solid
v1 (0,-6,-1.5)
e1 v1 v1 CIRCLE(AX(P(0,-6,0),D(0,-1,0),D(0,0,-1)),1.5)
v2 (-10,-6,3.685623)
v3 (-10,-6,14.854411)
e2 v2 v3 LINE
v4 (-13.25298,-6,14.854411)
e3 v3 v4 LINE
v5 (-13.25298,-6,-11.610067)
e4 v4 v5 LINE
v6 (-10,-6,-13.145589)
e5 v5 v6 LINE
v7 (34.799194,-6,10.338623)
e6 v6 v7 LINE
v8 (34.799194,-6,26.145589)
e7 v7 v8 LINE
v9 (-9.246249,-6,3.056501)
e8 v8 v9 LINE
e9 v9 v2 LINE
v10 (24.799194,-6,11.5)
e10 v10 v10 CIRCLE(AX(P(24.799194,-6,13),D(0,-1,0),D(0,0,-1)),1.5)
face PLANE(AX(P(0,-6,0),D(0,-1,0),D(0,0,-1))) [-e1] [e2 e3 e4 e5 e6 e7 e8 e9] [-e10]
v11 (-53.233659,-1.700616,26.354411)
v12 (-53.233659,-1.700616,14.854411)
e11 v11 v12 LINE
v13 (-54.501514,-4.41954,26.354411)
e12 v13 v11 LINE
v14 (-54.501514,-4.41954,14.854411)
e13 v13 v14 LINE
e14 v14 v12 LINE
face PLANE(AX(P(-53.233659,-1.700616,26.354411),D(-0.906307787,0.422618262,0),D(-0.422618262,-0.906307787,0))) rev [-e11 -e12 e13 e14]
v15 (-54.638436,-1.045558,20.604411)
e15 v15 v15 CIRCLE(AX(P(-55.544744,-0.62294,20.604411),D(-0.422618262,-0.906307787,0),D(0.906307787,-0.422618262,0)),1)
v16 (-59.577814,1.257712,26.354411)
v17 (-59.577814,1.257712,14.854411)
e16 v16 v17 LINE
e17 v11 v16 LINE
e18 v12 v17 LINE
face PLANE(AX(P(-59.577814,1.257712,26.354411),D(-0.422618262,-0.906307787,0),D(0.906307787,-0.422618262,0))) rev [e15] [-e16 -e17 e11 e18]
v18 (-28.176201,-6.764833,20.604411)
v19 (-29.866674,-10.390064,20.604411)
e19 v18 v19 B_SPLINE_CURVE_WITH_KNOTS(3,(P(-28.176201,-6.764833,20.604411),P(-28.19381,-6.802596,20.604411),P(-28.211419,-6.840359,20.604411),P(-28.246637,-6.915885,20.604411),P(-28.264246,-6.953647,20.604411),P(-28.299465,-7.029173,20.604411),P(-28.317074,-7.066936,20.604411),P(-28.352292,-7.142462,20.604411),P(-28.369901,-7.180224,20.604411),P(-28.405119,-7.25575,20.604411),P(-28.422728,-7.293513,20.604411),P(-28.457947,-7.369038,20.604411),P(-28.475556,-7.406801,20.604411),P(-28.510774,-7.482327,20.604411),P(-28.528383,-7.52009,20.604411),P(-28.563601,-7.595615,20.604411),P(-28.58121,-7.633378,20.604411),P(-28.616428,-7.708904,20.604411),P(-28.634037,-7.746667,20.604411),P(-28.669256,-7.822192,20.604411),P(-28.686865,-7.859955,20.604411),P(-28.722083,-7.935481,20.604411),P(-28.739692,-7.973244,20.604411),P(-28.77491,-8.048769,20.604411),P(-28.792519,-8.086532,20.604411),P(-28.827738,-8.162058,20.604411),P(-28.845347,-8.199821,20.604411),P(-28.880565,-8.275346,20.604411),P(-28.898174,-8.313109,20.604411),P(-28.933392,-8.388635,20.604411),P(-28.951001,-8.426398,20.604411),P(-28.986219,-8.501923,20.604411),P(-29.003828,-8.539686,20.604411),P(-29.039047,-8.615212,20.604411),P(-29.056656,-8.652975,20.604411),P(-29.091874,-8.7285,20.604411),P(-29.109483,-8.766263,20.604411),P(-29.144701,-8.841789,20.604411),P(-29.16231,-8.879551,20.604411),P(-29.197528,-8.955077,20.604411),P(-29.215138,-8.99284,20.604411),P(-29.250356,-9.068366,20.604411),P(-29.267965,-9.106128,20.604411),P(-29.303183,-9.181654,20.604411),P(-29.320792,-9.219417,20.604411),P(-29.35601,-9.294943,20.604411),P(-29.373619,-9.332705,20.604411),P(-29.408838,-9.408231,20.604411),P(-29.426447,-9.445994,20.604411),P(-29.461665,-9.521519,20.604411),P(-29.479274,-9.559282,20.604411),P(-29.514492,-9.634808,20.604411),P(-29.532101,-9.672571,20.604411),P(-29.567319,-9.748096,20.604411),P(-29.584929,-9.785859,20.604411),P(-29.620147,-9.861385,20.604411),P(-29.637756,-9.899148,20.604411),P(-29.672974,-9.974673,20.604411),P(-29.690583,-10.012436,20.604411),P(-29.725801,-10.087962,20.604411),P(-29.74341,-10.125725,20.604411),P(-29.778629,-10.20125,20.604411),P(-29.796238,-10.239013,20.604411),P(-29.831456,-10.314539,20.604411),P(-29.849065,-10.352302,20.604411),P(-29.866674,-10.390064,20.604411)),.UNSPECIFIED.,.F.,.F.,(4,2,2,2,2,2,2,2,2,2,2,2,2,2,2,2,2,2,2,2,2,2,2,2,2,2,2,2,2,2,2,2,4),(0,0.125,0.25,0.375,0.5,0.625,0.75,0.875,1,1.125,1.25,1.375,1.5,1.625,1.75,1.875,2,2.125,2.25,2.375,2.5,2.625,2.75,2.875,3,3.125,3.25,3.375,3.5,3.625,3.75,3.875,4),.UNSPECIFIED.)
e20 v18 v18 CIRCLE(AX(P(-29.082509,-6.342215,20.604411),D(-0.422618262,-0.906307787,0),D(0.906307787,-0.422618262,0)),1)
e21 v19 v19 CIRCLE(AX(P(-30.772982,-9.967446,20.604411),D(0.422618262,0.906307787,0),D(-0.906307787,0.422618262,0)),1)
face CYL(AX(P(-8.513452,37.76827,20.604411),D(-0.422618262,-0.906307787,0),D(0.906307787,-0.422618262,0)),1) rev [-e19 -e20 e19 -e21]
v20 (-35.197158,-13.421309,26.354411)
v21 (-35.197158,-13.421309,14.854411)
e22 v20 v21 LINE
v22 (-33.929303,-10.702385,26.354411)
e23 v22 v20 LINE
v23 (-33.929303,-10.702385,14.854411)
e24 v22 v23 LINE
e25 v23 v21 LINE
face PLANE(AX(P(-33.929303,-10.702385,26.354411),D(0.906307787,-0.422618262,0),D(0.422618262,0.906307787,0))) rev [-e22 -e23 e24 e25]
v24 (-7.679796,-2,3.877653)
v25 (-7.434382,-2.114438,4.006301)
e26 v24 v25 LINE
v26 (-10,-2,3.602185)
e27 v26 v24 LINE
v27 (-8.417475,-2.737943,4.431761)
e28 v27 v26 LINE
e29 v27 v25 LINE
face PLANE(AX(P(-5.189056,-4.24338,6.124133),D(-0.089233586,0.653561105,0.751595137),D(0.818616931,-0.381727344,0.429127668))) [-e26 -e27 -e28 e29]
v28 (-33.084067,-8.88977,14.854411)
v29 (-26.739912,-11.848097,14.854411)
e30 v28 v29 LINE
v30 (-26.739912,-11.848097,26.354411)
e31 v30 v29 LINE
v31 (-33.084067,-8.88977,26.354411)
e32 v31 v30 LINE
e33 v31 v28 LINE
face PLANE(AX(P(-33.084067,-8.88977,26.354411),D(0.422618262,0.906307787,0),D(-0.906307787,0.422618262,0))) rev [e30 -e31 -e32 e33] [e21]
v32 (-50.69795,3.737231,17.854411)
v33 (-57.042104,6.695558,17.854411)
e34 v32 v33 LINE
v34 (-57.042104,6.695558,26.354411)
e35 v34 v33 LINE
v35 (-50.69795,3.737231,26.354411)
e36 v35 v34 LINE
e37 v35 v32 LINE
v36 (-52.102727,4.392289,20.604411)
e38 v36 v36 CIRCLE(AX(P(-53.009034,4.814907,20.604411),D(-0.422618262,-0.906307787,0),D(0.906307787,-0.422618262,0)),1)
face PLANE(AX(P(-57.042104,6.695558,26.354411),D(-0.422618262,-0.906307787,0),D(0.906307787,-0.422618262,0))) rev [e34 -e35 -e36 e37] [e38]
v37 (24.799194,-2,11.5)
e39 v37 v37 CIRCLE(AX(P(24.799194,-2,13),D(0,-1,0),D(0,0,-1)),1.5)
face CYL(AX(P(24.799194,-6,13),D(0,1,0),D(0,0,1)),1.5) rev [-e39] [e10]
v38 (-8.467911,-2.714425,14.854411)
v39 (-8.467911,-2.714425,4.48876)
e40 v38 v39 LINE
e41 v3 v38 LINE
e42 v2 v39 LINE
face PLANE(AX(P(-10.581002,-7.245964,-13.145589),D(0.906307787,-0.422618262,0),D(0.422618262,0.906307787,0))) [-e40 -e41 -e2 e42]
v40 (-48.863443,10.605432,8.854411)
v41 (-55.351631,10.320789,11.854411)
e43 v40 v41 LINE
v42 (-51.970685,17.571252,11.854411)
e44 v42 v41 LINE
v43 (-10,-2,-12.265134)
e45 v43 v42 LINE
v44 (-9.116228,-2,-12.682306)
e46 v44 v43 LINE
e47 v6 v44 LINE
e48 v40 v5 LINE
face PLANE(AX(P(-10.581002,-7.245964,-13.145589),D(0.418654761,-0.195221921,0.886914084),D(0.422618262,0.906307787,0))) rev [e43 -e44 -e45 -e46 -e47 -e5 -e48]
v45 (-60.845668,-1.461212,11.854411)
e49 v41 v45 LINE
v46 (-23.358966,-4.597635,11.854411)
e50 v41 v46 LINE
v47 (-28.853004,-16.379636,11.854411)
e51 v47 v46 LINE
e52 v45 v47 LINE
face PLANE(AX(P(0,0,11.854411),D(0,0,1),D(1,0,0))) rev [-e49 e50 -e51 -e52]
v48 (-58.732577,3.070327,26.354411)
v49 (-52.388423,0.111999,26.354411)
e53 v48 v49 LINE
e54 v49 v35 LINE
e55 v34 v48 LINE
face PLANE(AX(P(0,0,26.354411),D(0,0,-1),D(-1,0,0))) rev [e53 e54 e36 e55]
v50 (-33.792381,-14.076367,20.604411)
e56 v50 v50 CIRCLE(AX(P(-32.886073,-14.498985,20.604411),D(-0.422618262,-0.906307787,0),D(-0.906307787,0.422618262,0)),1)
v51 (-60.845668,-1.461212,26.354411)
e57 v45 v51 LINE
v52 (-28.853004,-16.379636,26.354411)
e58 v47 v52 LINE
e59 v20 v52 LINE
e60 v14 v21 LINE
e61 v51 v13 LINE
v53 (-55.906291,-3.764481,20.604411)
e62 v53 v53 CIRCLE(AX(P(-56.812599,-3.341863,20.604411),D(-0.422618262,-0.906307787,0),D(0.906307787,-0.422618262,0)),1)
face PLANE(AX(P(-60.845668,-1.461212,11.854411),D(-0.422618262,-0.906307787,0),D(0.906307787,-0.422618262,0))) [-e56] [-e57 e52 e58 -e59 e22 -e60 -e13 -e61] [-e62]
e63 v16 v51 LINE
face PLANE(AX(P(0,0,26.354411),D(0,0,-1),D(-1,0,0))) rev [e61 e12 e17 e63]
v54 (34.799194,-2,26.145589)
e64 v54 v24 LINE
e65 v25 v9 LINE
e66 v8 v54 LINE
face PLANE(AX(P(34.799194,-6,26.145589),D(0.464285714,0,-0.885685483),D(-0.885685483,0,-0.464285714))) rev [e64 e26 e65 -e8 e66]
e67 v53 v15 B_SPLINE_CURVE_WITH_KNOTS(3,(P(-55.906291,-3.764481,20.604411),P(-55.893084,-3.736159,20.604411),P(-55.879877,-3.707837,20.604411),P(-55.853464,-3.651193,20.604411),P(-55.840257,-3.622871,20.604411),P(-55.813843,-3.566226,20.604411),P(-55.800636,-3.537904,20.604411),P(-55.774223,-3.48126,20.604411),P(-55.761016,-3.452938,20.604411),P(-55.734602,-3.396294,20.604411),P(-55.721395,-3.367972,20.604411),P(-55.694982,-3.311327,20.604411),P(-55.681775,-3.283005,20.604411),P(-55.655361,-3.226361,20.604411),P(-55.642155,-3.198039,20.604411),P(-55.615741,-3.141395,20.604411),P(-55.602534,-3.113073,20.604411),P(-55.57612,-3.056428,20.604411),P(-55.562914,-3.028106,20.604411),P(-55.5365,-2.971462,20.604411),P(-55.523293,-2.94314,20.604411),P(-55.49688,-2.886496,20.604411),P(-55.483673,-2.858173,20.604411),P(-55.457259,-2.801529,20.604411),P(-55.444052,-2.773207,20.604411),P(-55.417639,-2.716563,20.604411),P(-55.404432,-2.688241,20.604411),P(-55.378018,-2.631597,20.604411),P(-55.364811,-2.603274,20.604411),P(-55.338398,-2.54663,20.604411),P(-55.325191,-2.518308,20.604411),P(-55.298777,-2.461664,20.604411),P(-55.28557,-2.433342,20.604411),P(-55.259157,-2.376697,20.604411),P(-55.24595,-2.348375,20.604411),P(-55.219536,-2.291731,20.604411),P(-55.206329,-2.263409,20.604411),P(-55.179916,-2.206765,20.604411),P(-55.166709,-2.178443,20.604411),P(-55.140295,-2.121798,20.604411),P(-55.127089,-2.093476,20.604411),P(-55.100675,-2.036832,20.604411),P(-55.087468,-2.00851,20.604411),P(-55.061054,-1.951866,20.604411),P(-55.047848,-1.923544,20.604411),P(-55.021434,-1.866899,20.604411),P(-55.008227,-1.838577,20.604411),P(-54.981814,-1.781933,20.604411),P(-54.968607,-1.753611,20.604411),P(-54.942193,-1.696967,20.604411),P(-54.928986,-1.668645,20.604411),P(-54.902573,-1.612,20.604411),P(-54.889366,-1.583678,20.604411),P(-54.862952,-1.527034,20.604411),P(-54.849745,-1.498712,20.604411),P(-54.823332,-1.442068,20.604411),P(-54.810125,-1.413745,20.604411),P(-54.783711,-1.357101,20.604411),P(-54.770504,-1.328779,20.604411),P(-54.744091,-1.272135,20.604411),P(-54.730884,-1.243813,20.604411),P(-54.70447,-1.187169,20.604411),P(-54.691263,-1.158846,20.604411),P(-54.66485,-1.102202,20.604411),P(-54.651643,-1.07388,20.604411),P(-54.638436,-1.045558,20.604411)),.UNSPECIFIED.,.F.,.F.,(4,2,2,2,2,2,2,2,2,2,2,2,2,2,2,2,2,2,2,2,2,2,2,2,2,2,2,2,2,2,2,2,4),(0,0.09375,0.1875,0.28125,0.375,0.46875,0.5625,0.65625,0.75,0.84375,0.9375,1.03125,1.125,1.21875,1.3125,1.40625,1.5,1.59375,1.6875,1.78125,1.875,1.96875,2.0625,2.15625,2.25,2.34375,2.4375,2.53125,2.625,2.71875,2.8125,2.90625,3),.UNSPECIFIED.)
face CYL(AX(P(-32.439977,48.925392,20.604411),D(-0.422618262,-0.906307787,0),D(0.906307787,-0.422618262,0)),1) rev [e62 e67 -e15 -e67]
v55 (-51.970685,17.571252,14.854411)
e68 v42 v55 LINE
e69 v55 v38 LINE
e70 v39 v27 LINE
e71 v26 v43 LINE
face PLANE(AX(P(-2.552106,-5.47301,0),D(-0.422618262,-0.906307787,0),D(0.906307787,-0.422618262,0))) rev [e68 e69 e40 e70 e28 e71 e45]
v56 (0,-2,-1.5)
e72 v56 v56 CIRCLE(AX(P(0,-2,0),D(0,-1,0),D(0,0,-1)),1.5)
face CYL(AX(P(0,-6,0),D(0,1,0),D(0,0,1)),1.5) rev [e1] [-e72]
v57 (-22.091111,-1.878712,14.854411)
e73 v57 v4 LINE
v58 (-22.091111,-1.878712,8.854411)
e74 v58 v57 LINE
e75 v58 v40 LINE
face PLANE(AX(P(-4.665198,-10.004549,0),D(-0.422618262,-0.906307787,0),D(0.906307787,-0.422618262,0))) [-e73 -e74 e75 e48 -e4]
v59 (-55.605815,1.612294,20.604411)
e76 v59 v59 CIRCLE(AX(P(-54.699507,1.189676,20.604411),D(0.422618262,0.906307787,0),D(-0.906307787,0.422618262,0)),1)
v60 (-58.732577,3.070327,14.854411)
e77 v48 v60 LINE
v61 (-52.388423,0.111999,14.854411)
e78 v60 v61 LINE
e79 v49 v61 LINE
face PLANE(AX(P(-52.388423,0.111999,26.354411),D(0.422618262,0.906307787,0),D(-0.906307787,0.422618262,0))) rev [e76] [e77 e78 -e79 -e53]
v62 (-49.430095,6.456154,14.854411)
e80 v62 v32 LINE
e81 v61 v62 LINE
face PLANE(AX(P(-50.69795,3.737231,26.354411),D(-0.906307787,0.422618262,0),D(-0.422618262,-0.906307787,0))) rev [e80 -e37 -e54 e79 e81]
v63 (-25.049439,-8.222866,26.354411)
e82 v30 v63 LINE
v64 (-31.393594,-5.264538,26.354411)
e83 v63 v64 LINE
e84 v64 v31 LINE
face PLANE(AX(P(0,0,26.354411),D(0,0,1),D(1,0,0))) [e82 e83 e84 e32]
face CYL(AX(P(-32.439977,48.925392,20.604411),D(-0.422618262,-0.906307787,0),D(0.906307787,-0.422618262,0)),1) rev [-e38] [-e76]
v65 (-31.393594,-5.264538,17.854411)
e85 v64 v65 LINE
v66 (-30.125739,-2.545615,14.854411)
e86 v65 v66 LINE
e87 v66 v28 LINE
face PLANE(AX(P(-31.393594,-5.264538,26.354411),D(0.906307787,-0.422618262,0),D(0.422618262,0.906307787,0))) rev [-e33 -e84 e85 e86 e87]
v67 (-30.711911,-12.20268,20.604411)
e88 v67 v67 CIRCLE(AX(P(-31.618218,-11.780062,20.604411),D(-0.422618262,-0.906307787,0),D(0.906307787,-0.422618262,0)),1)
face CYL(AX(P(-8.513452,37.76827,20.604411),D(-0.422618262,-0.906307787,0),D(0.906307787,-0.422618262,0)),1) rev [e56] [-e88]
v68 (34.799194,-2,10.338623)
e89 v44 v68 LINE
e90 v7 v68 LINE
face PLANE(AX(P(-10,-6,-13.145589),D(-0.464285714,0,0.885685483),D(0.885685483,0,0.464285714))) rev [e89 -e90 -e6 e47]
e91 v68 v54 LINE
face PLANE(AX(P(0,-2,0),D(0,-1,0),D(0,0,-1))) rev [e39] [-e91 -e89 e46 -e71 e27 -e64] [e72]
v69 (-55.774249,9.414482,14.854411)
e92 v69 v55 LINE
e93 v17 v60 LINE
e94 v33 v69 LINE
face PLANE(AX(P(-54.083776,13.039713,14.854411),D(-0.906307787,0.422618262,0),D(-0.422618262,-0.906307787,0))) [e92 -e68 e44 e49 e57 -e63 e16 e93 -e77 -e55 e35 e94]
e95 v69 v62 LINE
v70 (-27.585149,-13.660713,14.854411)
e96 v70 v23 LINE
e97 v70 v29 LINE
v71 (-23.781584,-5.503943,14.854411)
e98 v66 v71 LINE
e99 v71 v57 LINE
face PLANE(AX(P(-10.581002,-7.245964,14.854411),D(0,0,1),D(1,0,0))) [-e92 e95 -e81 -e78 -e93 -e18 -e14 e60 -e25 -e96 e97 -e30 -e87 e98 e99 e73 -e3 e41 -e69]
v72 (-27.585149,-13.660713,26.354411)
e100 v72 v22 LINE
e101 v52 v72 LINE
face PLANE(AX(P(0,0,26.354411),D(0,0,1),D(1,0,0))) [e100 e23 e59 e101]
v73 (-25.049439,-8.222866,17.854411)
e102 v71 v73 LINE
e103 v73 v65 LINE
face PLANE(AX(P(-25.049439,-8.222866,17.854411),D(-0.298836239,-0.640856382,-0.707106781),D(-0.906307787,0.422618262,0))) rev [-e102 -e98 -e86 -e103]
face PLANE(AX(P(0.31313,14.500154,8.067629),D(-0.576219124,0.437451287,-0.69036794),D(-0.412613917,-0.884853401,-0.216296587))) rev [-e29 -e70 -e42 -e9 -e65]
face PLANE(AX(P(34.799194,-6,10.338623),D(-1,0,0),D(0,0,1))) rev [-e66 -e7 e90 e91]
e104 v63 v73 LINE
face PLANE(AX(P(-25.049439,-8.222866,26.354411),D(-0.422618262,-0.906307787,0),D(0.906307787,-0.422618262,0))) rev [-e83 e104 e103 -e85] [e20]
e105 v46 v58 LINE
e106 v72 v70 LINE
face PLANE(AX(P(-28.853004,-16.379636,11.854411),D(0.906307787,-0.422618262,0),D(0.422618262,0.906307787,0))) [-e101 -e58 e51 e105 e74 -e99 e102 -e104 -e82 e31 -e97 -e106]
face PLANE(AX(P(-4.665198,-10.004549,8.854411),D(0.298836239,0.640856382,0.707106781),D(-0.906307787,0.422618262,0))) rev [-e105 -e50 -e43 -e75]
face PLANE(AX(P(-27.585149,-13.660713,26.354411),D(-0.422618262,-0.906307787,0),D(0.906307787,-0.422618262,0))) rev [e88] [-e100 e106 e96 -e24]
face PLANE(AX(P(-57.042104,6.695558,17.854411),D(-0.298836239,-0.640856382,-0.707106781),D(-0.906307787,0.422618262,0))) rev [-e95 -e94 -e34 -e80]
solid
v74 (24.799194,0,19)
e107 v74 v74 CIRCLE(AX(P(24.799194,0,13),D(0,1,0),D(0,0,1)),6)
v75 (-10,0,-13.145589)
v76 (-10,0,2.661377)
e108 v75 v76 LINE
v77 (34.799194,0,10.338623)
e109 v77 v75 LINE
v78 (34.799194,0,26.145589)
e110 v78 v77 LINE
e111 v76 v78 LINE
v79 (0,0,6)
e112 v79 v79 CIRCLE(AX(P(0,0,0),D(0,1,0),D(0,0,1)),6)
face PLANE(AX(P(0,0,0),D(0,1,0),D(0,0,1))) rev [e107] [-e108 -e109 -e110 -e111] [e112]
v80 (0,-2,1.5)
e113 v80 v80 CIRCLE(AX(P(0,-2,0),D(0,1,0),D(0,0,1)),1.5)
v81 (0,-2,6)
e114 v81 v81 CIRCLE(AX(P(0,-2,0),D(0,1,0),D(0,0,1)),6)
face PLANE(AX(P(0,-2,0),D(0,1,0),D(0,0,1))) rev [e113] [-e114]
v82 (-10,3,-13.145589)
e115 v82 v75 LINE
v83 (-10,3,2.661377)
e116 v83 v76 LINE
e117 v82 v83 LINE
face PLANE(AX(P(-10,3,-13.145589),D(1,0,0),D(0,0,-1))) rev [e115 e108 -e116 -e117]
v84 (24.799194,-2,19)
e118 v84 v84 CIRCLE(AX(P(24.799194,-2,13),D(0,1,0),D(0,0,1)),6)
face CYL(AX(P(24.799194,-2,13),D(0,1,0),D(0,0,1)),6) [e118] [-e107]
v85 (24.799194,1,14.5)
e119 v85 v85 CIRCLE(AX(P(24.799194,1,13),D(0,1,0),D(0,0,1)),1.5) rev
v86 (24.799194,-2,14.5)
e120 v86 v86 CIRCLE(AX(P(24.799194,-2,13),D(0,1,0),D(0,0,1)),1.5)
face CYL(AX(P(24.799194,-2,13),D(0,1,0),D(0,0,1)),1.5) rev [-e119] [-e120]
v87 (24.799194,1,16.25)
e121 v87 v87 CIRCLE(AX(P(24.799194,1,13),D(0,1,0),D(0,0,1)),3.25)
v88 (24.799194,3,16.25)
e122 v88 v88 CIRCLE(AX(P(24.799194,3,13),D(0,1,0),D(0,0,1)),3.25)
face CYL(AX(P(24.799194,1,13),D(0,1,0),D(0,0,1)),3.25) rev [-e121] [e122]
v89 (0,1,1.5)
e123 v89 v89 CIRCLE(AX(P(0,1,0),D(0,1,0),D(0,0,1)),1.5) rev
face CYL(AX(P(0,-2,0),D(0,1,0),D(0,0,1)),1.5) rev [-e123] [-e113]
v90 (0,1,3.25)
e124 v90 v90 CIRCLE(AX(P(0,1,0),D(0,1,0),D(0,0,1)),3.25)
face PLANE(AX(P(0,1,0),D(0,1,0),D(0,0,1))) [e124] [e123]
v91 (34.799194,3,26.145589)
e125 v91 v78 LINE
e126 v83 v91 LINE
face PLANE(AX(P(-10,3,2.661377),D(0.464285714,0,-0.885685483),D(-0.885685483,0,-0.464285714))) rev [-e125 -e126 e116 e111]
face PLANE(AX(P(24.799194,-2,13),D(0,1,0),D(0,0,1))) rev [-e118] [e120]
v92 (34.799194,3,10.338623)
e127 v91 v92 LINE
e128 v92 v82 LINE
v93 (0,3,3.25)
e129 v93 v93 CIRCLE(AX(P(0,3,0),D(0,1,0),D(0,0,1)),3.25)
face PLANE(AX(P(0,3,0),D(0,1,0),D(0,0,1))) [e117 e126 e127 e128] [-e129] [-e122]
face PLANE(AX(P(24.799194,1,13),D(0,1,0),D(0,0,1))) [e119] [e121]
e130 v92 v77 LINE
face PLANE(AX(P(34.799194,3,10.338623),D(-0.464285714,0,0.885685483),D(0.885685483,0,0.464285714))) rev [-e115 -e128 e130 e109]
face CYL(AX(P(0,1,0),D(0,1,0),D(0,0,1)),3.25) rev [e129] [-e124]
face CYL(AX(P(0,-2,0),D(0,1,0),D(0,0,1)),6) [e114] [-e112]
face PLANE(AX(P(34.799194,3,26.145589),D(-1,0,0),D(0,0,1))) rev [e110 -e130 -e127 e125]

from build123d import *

# Parameters (mm, degrees)
BOSS_EXTRUDE1_DEPTH  = 3
SKETCH1_R            = 6
SKETCH1_R_2          = 5.999999999999998
BOSS_EXTRUDE3_DEPTH  = 2
SKETCH4_R            = 1.5000000000000013
SKETCH4_R_2          = 1.5000000000000009
CUT_EXTRUDE1_DEPTH   = 44.812962496801305
SKETCH5_R            = 3.25
SKETCH5_R_2          = 3.2500000000000004
CUT_EXTRUDE2_DEPTH   = 2
SKETCH6_R            = 1.5000000000000013
SKETCH6_R_2          = 1.5000000000000009
BOSS_EXTRUDE4_DEPTH  = 4
BOSS_EXTRUDE9_DEPTH  = 5
BOSS_EXTRUDE10_DEPTH = 3
BOSS_EXTRUDE11_DEPTH = 11.5
SKETCH24_R           = 0.9999999999999983
CUT_EXTRUDE3_DEPTH   = 71.05142175706676
CUT_EXTRUDE4_DEPTH   = 71.37296543116399
CUT_EXTRUDE5_DEPTH   = 75.00527115702536
CHAMFER2_SIZE        = 1
CHAMFER2_SIZE_2      = 0.849779112
CHAMFER2_SIZE_3      = 0.753042781
CHAMFER3_SIZE        = 48
CHAMFER3_SIZE_2      = 25
CHAMFER4_SIZE        = 3
CHAMFER5_SIZE        = 3


with BuildPart() as part:
    # Sketch3 → Boss-Extrude1 (new body)
    with BuildSketch(Plane(origin=(0, 0, 0), x_dir=(1, 0, 0), z_dir=(0, 1, 0))):
        Polygon((-10, 13.145588768291844), (-9.999999999999998, -2.66137686720019), (34.79919353527449, -26.14558876829183), (34.79919353527449, -10.33862313279981), align=None)
    extrude(amount=BOSS_EXTRUDE1_DEPTH)

    # Sketch1 → Boss-Extrude3 (add)
    with BuildSketch(Plane(origin=(0, 0, 0), x_dir=(1, 0, 0), z_dir=(0, 1, 0))):
        with Locations(Location((0, 0, 0), (0, 0, 270))):
            Circle(SKETCH1_R)
        with Locations(Location((24.79919353527449, -13.000000000000002, 0), (0, 0, 270))):
            Circle(SKETCH1_R_2)
    extrude(amount=-BOSS_EXTRUDE3_DEPTH)

    # Sketch4 → Cut-Extrude1 (cut, through all)
    with BuildSketch(Plane(origin=(0, 3, 0), x_dir=(1, 0, 0), z_dir=(0, 1, 0))):
        with Locations(Location((0, 0, 0), (0, 0, 270))):
            Circle(SKETCH4_R)
        with Locations(Location((24.79919353527449, -13.000000000000002, 0), (0, 0, 270))):
            Circle(SKETCH4_R_2)
    extrude(amount=-CUT_EXTRUDE1_DEPTH, mode=Mode.SUBTRACT)

    # Sketch5 → Cut-Extrude2 (cut)
    with BuildSketch(Plane(origin=(0, 3, 0), x_dir=(1, 0, 0), z_dir=(0, 1, 0))):
        with Locations(Location((0, 0, 0), (0, 0, 270))):
            Circle(SKETCH5_R)
        with Locations(Location((24.79919353527449, -13.000000000000002, 0), (0, 0, 270))):
            Circle(SKETCH5_R_2)
    extrude(amount=-CUT_EXTRUDE2_DEPTH, mode=Mode.SUBTRACT)


with BuildPart() as body_2:
    # Sketch6 → Boss-Extrude4 (new body)
    with BuildSketch(Plane.XZ.offset(2)):
        Polygon((-9.999999999999998, 2.66137686720019), (-10, -13.145588768291844), (34.79919353527449, 10.33862313279981), (34.79919353527449, 26.14558876829183), align=None)
        with Locations(Location((0, 0, 0), (0, 0, 270))):
            Circle(SKETCH6_R, mode=Mode.SUBTRACT)
        with Locations(Location((24.79919353527449, 13.000000000000002, 0), (0, 0, 270))):
            Circle(SKETCH6_R_2, mode=Mode.SUBTRACT)
    extrude(amount=BOSS_EXTRUDE4_DEPTH)

    # Sketch19 → Boss-Extrude9 (add)
    with BuildSketch(Plane(origin=(-2.5521063946862226, -5.473009825281398, 2.8e-16), x_dir=(0.9063077870366528, -0.42261826174069356, 0), z_dir=(0.42261826174069356, 0.9063077870366528, 0))):
        Polygon((-6.527368299922367, 13.145588768291844), (-6.5273682999223634, -14.854411231708156), (-54.52736829992237, -14.854411231708161), (-54.52736829992237, 13.145588768291844), align=None)
    extrude(amount=-BOSS_EXTRUDE9_DEPTH)

    # Sketch22 → Boss-Extrude10 (add)
    with BuildSketch(Plane.XY.offset(14.854411231708154)):
        Polygon((-51.9706848915214, 17.571251782926392), (-60.84566838807596, -1.4612117448433186), (-28.85300350568211, -16.379636384289785), (-19.97802000912756, 2.652827143479914), align=None)
    extrude(amount=-BOSS_EXTRUDE10_DEPTH)

    # Sketch23 → Boss-Extrude11 (add)
    with BuildSketch(Plane.XY.offset(14.854411231708154)):
        Polygon((-58.73257707937249, 3.0703271903399454), (-57.04210403240972, 6.695558338486558), (-50.697949523153156, 3.737230506301715), (-52.38842257011593, 0.11199935815509857), align=None)
        Polygon((-60.84566838807596, -1.4612117448433186), (-59.57781360285388, 1.2577116162666404), (-53.23365909359731, -1.7006162159182072), (-54.501513878819395, -4.419539577028165), align=None)
        Polygon((-35.19715801493865, -13.421308552104925), (-28.85300350568211, -16.379636384289785), (-27.58514872046003, -13.6607130231798), (-33.92930322971659, -10.702385190994963), align=None)
        Polygon((-33.0840667062352, -8.88976961692166), (-26.73991219697864, -11.8480974491065), (-25.049439150015868, -8.222866300959888), (-31.393593659272426, -5.264538468775042), align=None)
    extrude(amount=BOSS_EXTRUDE11_DEPTH)

    # Sketch24 → Cut-Extrude3 (cut, through all)
    with BuildSketch(Plane(origin=(-11.42708989124078, -24.505473353051112, 0), x_dir=(0.9063077870366529, -0.4226182617406931, 0), z_dir=(-0.42261826174069306, -0.9063077870366528, 0))):
        with Locations((-50.077368299922384, 20.604411231708156)):
            Circle(SKETCH24_R)
        with Locations((-23.677368299922374, 20.60441123170816)):
            Circle(SKETCH24_R)
    extrude(amount=-CUT_EXTRUDE3_DEPTH, mode=Mode.SUBTRACT)

    # Sketch25 → Cut-Extrude4 (cut, through all)
    with BuildSketch(Plane.XZ.offset(5.999999999999999)):
        Polygon((-1.7598045547698953, -8.82599101058171), (-0.856014781659975, -22.343448840083095), (-19.416391366852192, -22.343448840083095), (-12.561706832548245, 28.592130084052375), (-0.856014781659975, 28.592130084052375), align=None)
    extrude(amount=CUT_EXTRUDE4_DEPTH, mode=Mode.SUBTRACT)

    # Sketch26 → Cut-Extrude5 (cut, through all)
    with BuildSketch(Plane(origin=(3.2500000000000018, 0, -6.1997983838186235), x_dir=(-0.8856854834026603, 0, -0.46428571428571436), z_dir=(0.4642857142857144, 0, -0.8856854834026604))):
        Polygon((-2.6471574670381415, -3.4708885976233637), (-2.0453444794839015, -11.294457435868079), (36.03300455139902, -14.522363460038978), (23.996744800257375, 7.088193820427202), align=None)
    extrude(amount=CUT_EXTRUDE5_DEPTH, mode=Mode.SUBTRACT)

    # Chamfer2
    # the kernel refuses this chamfer: 1, 0.849779112, 0.753042781 mm, written as the material it adds along each edge
    with BuildSketch(Plane(origin=(-6.36268787947312, -3.696106496901656, 4.568094418300827), x_dir=(0.33809036708449836, 0.9242749779914556, 0.17723055251158967), z_dir=(-0.8186169306793458, 0.38172734387111207, -0.4291276683531757))) as chamfer2_piece_1_section:
        Polygon((CHAMFER2_SIZE, -2e-17), (CHAMFER2_SIZE_2 * 0.196215621581, -CHAMFER2_SIZE_2 * 0.980560773459), (0, 0), align=None)
    chamfer2_piece_1 = extrude(amount=7.014923756891123, mode=Mode.PRIVATE)
    chamfer2_piece_1 = split(chamfer2_piece_1, bisect_by=Plane(origin=(-6.36268787947312, -2, 4.568094418300827), z_dir=(0, -1, 0)), keep=Keep.TOP, mode=Mode.PRIVATE)
    chamfer2_piece_1 = split(chamfer2_piece_1, bisect_by=Plane(origin=(-8.46791111376206, -2.714424780626905, 4.568094418300827), z_dir=(-0.9063077870366527, 0.4226182617406935, 0)), keep=Keep.TOP, mode=Mode.PRIVATE)
    add(chamfer2_piece_1)
    with BuildSketch(Plane(origin=(-11.061112191786581, -8.275562438723423, 2.1051306137240746), x_dir=(-0.09141088767312612, -0.19603128122495278, 0.9763277044087783), z_dir=(0.4126139173265195, 0.884853401205295, 0.21629658712953703))) as chamfer2_piece_2_section:
        Polygon((CHAMFER2_SIZE, 0), (CHAMFER2_SIZE_3 * 0.420785758249, CHAMFER2_SIZE_3 * 0.907160044076), (0, 0), align=None)
    chamfer2_piece_2 = extrude(amount=8.85649542189165, mode=Mode.PRIVATE)
    chamfer2_piece_2 = split(chamfer2_piece_2, bisect_by=Plane(origin=(-11.061112191786581, -6, 2.1051306137240746), z_dir=(0, 1, 0)), keep=Keep.TOP, mode=Mode.PRIVATE)
    chamfer2_piece_2 = split(chamfer2_piece_2, bisect_by=Plane(origin=(-8.467911113762062, -2.7144247806268984, 2.105130613724074), z_dir=(-0.42261826174069356, -0.9063077870366528, 0)), keep=Keep.TOP, mode=Mode.PRIVATE)
    add(chamfer2_piece_2)
    with BuildSketch(Plane(origin=(-11.061112191786581, -8.275562438723423, 2.1051306137240746), x_dir=(-0.09141088767312612, -0.19603128122495278, 0.9763277044087783), z_dir=(0.4126139173265195, 0.884853401205295, 0.21629658712953703))) as chamfer2_piece_3a_section:
        Polygon((CHAMFER2_SIZE, 0), (CHAMFER2_SIZE_3 * 0.420785758249, CHAMFER2_SIZE_3 * 0.907160044076), (0, 0), align=None)
    chamfer2_piece_3a = extrude(amount=8.85649542189165, mode=Mode.PRIVATE)
    chamfer2_piece_3a = split(chamfer2_piece_3a, bisect_by=Plane(origin=(-11.061112191786581, -2, 2.1051306137240746), z_dir=(0, -1, 0)), keep=Keep.TOP, mode=Mode.PRIVATE)
    chamfer2_piece_3a = split(chamfer2_piece_3a, bisect_by=Plane(origin=(-8.467911113762062, -2.7144247806268993, 2.105130613724074), z_dir=(0.42261826174069356, 0.9063077870366528, 0)), keep=Keep.TOP, mode=Mode.PRIVATE)
    with BuildSketch(Plane(origin=(-6.36268787947312, -3.696106496901656, 4.568094418300827), x_dir=(0.33809036708449836, 0.9242749779914556, 0.17723055251158967), z_dir=(-0.8186169306793458, 0.38172734387111207, -0.4291276683531757))) as chamfer2_piece_3b_section:
        Polygon((CHAMFER2_SIZE, -2e-17), (CHAMFER2_SIZE_2 * 0.196215621581, -CHAMFER2_SIZE_2 * 0.980560773459), (0, 0), align=None)
    chamfer2_piece_3b = extrude(amount=7.014923756891123, mode=Mode.PRIVATE)
    chamfer2_piece_3b = split(chamfer2_piece_3b, bisect_by=Plane(origin=(-6.36268787947312, -2, 4.568094418300827), z_dir=(0, -1, 0)), keep=Keep.TOP, mode=Mode.PRIVATE)
    chamfer2_piece_3b = split(chamfer2_piece_3b, bisect_by=Plane(origin=(-8.46791111376206, -2.714424780626905, 4.568094418300827), z_dir=(0.9063077870366527, -0.4226182617406935, 0)), keep=Keep.TOP, mode=Mode.PRIVATE)
    chamfer2_piece_3 = chamfer2_piece_3a & chamfer2_piece_3b
    add(chamfer2_piece_3)

    # Chamfer3
    # the kernel refuses this chamfer: 48, 25 mm, written as the material it takes off along each edge
    with BuildSketch(Plane(origin=(0.5510317235878048, 130.20443654107186, -13.145588768291852), x_dir=(0.9063077870366527, -0.4226182617406935, 0), z_dir=(-0.4226182617406935, -0.9063077870366527, 0))) as chamfer3_piece_1:
        Polygon((CHAMFER3_SIZE, 0), (7.36e-15, CHAMFER3_SIZE_2), (0, 0), align=None)
    extrude(amount=253.55393800912003, mode=Mode.SUBTRACT)

    # Chamfer4
    chamfer4_edges = [body_2.edges().sort_by_distance(p)[0] for p in [
        (-38.08744375902795, 5.580500528019885, 11.854411231708156),
    ]]
    chamfer(chamfer4_edges, length=CHAMFER4_SIZE)

    # Chamfer5
    chamfer5_edges = [body_2.edges().sort_by_distance(p)[0] for p in [
        (-53.87002677778143, 5.216394422394137, 14.854411231708154),
        (-28.22151640464415, -6.743702384867465, 14.854411231708154),
    ]]
    chamfer(chamfer5_edges, length=CHAMFER5_SIZE)


solid = Compound([part.part, body_2.part])
